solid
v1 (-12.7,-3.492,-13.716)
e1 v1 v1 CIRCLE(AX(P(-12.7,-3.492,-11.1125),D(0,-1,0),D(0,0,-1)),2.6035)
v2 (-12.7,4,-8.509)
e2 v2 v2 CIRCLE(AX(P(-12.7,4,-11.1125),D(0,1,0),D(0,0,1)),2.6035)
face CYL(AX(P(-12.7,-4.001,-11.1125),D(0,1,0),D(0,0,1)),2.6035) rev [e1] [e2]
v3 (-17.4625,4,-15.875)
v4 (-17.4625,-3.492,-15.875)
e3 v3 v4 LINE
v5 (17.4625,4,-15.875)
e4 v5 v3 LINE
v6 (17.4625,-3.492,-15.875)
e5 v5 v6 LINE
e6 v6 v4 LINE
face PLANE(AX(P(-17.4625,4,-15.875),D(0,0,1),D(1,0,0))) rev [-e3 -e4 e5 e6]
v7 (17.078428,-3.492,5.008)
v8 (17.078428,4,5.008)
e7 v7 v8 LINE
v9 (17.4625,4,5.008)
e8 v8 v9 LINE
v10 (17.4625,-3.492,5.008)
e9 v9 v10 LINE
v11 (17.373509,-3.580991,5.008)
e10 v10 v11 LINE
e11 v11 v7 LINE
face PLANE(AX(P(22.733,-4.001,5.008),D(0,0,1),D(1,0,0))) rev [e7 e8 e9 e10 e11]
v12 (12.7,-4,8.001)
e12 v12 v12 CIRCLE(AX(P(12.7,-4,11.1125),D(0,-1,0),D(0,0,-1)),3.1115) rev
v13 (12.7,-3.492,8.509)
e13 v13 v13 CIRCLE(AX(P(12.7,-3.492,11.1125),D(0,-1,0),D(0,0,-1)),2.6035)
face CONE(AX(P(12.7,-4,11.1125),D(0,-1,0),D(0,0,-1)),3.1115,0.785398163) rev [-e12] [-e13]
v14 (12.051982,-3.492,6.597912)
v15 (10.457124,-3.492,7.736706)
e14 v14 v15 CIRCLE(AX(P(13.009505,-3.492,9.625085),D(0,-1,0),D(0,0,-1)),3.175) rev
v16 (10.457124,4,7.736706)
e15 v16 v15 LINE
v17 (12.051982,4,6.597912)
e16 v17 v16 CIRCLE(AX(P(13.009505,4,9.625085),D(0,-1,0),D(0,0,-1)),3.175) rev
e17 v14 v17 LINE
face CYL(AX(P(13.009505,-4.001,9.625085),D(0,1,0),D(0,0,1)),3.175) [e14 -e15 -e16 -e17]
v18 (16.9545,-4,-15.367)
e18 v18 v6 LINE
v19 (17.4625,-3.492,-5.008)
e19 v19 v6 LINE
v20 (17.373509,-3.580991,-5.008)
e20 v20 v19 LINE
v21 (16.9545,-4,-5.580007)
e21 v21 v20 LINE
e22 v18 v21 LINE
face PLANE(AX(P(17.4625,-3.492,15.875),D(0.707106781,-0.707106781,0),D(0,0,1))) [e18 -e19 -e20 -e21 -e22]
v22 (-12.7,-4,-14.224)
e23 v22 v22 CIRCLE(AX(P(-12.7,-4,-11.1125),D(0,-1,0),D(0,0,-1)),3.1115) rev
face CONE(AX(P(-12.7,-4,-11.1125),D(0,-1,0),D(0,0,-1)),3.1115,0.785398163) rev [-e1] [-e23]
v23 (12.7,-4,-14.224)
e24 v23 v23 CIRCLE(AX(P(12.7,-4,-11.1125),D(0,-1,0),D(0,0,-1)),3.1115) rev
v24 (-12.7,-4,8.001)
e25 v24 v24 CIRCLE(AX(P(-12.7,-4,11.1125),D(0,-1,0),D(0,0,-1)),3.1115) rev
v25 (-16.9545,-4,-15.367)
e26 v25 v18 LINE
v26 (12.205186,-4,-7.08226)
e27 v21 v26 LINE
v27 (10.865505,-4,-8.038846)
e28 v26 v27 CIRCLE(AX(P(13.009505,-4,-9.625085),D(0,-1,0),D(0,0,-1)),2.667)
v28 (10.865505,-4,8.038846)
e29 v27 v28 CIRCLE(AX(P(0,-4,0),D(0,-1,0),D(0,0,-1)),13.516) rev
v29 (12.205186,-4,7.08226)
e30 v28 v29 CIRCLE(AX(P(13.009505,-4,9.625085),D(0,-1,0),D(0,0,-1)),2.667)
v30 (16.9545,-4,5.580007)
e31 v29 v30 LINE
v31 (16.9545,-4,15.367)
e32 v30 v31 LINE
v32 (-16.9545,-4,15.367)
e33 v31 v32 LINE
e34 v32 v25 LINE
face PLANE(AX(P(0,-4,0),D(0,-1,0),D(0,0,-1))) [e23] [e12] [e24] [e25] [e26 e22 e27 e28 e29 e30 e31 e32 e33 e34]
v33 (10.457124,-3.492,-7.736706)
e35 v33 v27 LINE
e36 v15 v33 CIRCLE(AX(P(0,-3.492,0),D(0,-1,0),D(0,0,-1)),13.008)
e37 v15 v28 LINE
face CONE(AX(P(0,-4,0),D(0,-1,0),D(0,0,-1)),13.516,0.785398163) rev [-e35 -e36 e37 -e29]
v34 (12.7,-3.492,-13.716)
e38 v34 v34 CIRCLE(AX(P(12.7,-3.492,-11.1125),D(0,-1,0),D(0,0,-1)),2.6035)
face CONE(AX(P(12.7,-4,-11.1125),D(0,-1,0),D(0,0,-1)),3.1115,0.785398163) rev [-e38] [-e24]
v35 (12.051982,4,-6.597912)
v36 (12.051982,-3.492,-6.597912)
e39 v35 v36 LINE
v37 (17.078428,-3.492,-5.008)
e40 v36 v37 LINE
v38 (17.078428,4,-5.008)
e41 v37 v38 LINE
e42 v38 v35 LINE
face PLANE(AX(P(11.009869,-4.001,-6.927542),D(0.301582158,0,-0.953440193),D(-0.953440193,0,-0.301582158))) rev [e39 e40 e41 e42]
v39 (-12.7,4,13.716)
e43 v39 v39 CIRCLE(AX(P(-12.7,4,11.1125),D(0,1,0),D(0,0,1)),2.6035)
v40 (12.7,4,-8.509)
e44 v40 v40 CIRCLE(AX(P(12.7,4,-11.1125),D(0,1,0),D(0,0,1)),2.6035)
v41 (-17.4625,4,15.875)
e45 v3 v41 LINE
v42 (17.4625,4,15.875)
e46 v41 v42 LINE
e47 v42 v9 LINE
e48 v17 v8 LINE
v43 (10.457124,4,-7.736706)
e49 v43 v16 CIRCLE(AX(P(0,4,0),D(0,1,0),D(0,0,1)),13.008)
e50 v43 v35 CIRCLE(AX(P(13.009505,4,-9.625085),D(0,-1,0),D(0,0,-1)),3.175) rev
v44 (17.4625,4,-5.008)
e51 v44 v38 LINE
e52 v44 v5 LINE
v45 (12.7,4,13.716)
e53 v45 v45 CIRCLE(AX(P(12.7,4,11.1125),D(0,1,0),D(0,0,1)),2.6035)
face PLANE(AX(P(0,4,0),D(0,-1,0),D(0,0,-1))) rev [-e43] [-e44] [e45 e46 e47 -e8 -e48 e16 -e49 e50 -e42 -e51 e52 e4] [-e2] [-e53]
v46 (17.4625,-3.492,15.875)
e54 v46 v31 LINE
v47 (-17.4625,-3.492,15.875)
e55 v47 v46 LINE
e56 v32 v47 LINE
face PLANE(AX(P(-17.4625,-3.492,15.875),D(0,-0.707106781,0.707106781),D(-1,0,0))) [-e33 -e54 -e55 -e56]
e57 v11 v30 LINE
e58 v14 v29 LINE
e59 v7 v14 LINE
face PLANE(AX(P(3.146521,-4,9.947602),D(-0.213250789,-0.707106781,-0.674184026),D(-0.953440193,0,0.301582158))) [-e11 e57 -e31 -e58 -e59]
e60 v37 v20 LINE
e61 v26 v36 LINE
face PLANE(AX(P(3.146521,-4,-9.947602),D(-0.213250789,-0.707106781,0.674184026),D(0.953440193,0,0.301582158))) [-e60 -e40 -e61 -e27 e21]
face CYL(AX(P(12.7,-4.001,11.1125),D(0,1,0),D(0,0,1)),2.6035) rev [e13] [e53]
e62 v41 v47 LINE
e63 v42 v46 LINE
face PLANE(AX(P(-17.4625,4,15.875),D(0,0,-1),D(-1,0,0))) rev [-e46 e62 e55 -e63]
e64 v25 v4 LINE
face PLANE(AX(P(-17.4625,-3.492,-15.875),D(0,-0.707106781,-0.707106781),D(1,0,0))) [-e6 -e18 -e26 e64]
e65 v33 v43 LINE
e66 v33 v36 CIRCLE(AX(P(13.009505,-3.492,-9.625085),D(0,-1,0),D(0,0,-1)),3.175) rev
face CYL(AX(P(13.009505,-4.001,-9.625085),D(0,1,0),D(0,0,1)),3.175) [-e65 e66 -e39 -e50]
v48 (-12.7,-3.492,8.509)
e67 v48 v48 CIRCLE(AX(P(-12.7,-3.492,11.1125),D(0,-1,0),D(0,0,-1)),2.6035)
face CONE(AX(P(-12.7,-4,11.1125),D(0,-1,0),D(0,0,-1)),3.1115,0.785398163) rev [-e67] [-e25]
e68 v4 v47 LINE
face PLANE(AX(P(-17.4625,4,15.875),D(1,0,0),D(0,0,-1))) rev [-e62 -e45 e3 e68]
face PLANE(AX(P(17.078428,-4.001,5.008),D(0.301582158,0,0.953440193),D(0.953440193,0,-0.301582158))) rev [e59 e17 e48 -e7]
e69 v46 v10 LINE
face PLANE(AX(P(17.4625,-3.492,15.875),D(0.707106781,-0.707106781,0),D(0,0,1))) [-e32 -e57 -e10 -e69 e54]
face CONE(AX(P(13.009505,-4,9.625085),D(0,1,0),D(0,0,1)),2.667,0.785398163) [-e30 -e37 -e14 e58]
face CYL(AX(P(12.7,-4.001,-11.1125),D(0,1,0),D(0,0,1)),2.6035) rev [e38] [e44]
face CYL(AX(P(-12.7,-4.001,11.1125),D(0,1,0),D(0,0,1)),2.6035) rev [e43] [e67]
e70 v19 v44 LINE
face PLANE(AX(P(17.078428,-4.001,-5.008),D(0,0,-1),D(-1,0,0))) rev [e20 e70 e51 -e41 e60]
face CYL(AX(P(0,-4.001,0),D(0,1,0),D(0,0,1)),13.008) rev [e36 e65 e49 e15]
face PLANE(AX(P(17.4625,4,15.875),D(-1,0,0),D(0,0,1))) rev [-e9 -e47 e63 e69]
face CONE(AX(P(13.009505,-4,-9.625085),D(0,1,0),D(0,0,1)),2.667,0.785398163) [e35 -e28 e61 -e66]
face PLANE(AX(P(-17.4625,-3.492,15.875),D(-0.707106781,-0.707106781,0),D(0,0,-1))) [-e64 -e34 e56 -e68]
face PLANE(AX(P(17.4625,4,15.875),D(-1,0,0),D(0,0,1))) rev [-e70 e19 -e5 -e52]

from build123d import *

# Parameters (mm, degrees)
SKETCH1_W              = 34.925
SKETCH1_H              = 31.75
PLATE_DEPTH            = 4
F_10_CLEARANCE_HOLE1_D = 5.1054
LOAD_CELL_CUTOUT_REACH = 26.919
FILLET1_R              = 3.175
CUT_EXTRUDE1_REACH     = 26.919
SKETCH5_R              = 2.6035
CHAMFER1_SIZE          = 0.508


with BuildPart() as part:
    # Sketch1 → Plate (new, symmetric)
    with BuildSketch(Plane(origin=(0, 0, 0), x_dir=(1, 0, 0), z_dir=(0, 1, 0))):
        Rectangle(SKETCH1_W, SKETCH1_H)
    extrude(amount=PLATE_DEPTH, both=True)

    # #10 Clearance Hole1 (through all)
    with Locations(Plane(origin=(0, 4, 0), x_dir=(1, 0, 0), z_dir=(0, 1, 0))):
        with Locations((-12.7, 11.1125), (12.7, 11.1125), (12.7, -11.1125), (-12.7, -11.1125)):
            Hole(F_10_CLEARANCE_HOLE1_D / 2)

    # Sketch4 → Load Cell Cutout (cut, up to next)
    with BuildSketch(Plane(origin=(0, 4, 0), x_dir=(1, 0, 0), z_dir=(0, 1, 0)), mode=Mode.PRIVATE) as load_cell_cutout_sk1:
        with BuildLine():
            Line((11.009869163, 6.927542495), (17.078427656, 5.008))
            Line((17.078427656, 5.008), (22.733, 5.008))
            Line((22.733, 5.008), (22.733, -5.008))
            Line((22.733, -5.008), (17.078427656, -5.008))
            Line((17.078427656, -5.008), (11.009869163, -6.927542495))
            ThreePointArc((11.009869163, -6.927542495), (-13.008, 0), (11.009869163, 6.927542495))
        make_face()
    load_cell_cutout_tool1 = extrude(load_cell_cutout_sk1.sketch, amount=-LOAD_CELL_CUTOUT_REACH, mode=Mode.PRIVATE) & part.part
    add(load_cell_cutout_tool1.solids().sort_by_distance((2.977457, 4, 0))[0], mode=Mode.SUBTRACT)

    # Fillet1
    fillet1_edges = [part.edges().sort_by_distance(p)[0] for p in [
        (11.009869163, 0, 6.927542495),
        (11.009869163, 0, -6.927542495),
    ]]
    fillet(fillet1_edges, radius=FILLET1_R)

    # Sketch5 → Cut-Extrude1 (cut, up to next)
    with BuildSketch(Plane(origin=(0, 4, 0), x_dir=(1, 0, 0), z_dir=(0, 1, 0)), mode=Mode.PRIVATE) as cut_extrude1_sk1:
        with Locations(Location((-12.7, 11.1125, 0), (0, 0, 270))):
            Circle(SKETCH5_R)
    cut_extrude1_tool1 = extrude(cut_extrude1_sk1.sketch, amount=-CUT_EXTRUDE1_REACH, mode=Mode.PRIVATE) & part.part
    # Sketch5 → Cut-Extrude1 (cut, up to next)
    with BuildSketch(Plane(origin=(0, 4, 0), x_dir=(1, 0, 0), z_dir=(0, 1, 0)), mode=Mode.PRIVATE) as cut_extrude1_sk2:
        with Locations(Location((12.7, 11.1125, 0), (0, 0, 270))):
            Circle(SKETCH5_R)
    cut_extrude1_tool2 = extrude(cut_extrude1_sk2.sketch, amount=-CUT_EXTRUDE1_REACH, mode=Mode.PRIVATE) & part.part
    # Sketch5 → Cut-Extrude1 (cut, up to next)
    with BuildSketch(Plane(origin=(0, 4, 0), x_dir=(1, 0, 0), z_dir=(0, 1, 0)), mode=Mode.PRIVATE) as cut_extrude1_sk3:
        with Locations(Location((-12.7, -11.1125, 0), (0, 0, 270))):
            Circle(SKETCH5_R)
    cut_extrude1_tool3 = extrude(cut_extrude1_sk3.sketch, amount=-CUT_EXTRUDE1_REACH, mode=Mode.PRIVATE) & part.part
    # Sketch5 → Cut-Extrude1 (cut, up to next)
    with BuildSketch(Plane(origin=(0, 4, 0), x_dir=(1, 0, 0), z_dir=(0, 1, 0)), mode=Mode.PRIVATE) as cut_extrude1_sk4:
        with Locations(Location((12.7, -11.1125, 0), (0, 0, 270))):
            Circle(SKETCH5_R)
    cut_extrude1_tool4 = extrude(cut_extrude1_sk4.sketch, amount=-CUT_EXTRUDE1_REACH, mode=Mode.PRIVATE) & part.part
    add(cut_extrude1_tool1.solids().sort_by_distance((-12.7, 4, -11.1125))[0], mode=Mode.SUBTRACT)
    add(cut_extrude1_tool2.solids().sort_by_distance((12.7, 4, -11.1125))[0], mode=Mode.SUBTRACT)
    add(cut_extrude1_tool3.solids().sort_by_distance((-12.7, 4, 11.1125))[0], mode=Mode.SUBTRACT)
    add(cut_extrude1_tool4.solids().sort_by_distance((12.7, 4, 11.1125))[0], mode=Mode.SUBTRACT)

    # Chamfer1
    # the kernel refuses this chamfer: 0.508 mm, written as the material it takes off along each edge
    with BuildSketch(Plane(origin=(13.009505309, -4, -9.625084967), x_dir=(-0.30158215810749167, 0, 0.9534401931485937), z_dir=(0.9534401931485937, 0, 0.30158215810749167))) as chamfer1_piece_1:
        Polygon((3.175 - CHAMFER1_SIZE, 0), (3.175, -CHAMFER1_SIZE), (3.175, 0), align=None)
    revolve(axis=Axis((13.009505309, -4, -9.625084967), (0, -1, 0)), revolution_arc=35.951449602, mode=Mode.SUBTRACT)
    with BuildSketch(Plane(origin=(18.324016186, -4, -4.614008558), x_dir=(0.30146813499365677, -0.02749587661058555, -0.9530797135354744), z_dir=(-0.9534401931485939, 0, -0.30158215810749184)), Plane(origin=(12.051981957, -4, 6.597912354), x_dir=(0.30146813499365605, -0.02749587661058387, 0.9530797135354745), z_dir=(0.9534401931485941, 0, -0.30158215810749117))) as chamfer1_piece_2:
        Polygon((CHAMFER1_SIZE * 0.999621916911, -CHAMFER1_SIZE * 0.0274958766106), (-CHAMFER1_SIZE * 0.0274958766106, -CHAMFER1_SIZE * 0.999621916911), (0, 0), align=None)
    extrude(amount=6.578319516, mode=Mode.SUBTRACT)
    with BuildSketch(Plane(origin=(17.4625, -4, -3.701585042), x_dir=(-0.9996219169112968, -0.027495876610585605, 0), z_dir=(0, 0, -1)), Plane(origin=(17.4625, -4, 17.181414958), x_dir=(-0.9996219169112968, -0.027495876610585605, 0), z_dir=(0, 0, -1))) as chamfer1_piece_3:
        Polygon((CHAMFER1_SIZE * 0.999621916911, CHAMFER1_SIZE * 0.0274958766106), (-CHAMFER1_SIZE * 0.0274958766106, CHAMFER1_SIZE * 0.999621916911), (0, 0), align=None)
    extrude(amount=13.479829916, mode=Mode.SUBTRACT)
    with BuildSketch(Plane(origin=(18.768914958, -4, -15.875), x_dir=(0, -0.027495876610585605, 0.9996219169112968), z_dir=(-1, 0, 0)), Plane(origin=(-18.768914958, -4, 15.875), x_dir=(0, -0.027495876610585605, -0.9996219169112968), z_dir=(1, 0, 0))) as chamfer1_piece_4:
        Polygon((CHAMFER1_SIZE * 0.999621916911, CHAMFER1_SIZE * 0.0274958766106), (-CHAMFER1_SIZE * 0.0274958766106, CHAMFER1_SIZE * 0.999621916911), (0, 0), align=None)
    extrude(amount=37.537829916, mode=Mode.SUBTRACT)
    with BuildSketch(Plane(origin=(-17.4625, -4, -17.181414958), x_dir=(0.9996219169112968, -0.027495876610585605, 0), z_dir=(0, 0, 1))) as chamfer1_piece_5:
        Polygon((CHAMFER1_SIZE * 0.999621916911, CHAMFER1_SIZE * 0.0274958766106), (-CHAMFER1_SIZE * 0.0274958766106, CHAMFER1_SIZE * 0.999621916911), (0, 0), align=None)
    extrude(amount=34.362829916, mode=Mode.SUBTRACT)
    with BuildSketch(Plane(origin=(13.009505309, -4, 9.625084967), x_dir=(-0.8038994814723275, 0, -0.5947651836553002), z_dir=(-0.5947651836553002, 0, 0.8038994814723275))) as chamfer1_piece_6:
        Polygon((3.175 - CHAMFER1_SIZE, 0), (3.175, -CHAMFER1_SIZE), (3.175, 0), align=None)
    revolve(axis=Axis((13.009505309, -4, 9.625084967), (0, -1, 0)), revolution_arc=35.951449602, mode=Mode.SUBTRACT)
    with BuildSketch(Plane(origin=(0, -4, 0), x_dir=(0.8038994814723273, 0, -0.5947651836553005), z_dir=(0.5947651836553005, 0, 0.8038994814723273))) as chamfer1_piece_7:
        Polygon((13.008 + CHAMFER1_SIZE, 0), (13.008, CHAMFER1_SIZE), (13.008, 0), align=None)
    revolve(axis=Axis((0, -4, 0), (0, 1, 0)), revolution_arc=287.00821123, mode=Mode.SUBTRACT)
    with BuildSketch(Plane(origin=(-12.7, -4, -11.1125), x_dir=(0, 0, 1), z_dir=(-1, 0, 0))) as chamfer1_piece_8:
        Polygon((2.6035 + CHAMFER1_SIZE, 0), (2.6035, CHAMFER1_SIZE), (2.6035, 0), align=None)
    revolve(axis=Axis((-12.7, -4, -11.1125), (0, 1, 0)), mode=Mode.SUBTRACT)
    with BuildSketch(Plane(origin=(12.7, -4, -11.1125), x_dir=(0, 0, 1), z_dir=(-1, 0, 0))) as chamfer1_piece_9:
        Polygon((2.6035 + CHAMFER1_SIZE, 0), (2.6035, CHAMFER1_SIZE), (2.6035, 0), align=None)
    revolve(axis=Axis((12.7, -4, -11.1125), (0, 1, 0)), mode=Mode.SUBTRACT)
    with BuildSketch(Plane(origin=(-12.7, -4, 11.1125), x_dir=(0, 0, 1), z_dir=(-1, 0, 0))) as chamfer1_piece_10:
        Polygon((2.6035 + CHAMFER1_SIZE, 0), (2.6035, CHAMFER1_SIZE), (2.6035, 0), align=None)
    revolve(axis=Axis((-12.7, -4, 11.1125), (0, 1, 0)), mode=Mode.SUBTRACT)
    with BuildSketch(Plane(origin=(12.7, -4, 11.1125), x_dir=(0, 0, 1), z_dir=(-1, 0, 0))) as chamfer1_piece_11:
        Polygon((2.6035 + CHAMFER1_SIZE, 0), (2.6035, CHAMFER1_SIZE), (2.6035, 0), align=None)
    revolve(axis=Axis((12.7, -4, 11.1125), (0, 1, 0)), mode=Mode.SUBTRACT)


solid = part.part
